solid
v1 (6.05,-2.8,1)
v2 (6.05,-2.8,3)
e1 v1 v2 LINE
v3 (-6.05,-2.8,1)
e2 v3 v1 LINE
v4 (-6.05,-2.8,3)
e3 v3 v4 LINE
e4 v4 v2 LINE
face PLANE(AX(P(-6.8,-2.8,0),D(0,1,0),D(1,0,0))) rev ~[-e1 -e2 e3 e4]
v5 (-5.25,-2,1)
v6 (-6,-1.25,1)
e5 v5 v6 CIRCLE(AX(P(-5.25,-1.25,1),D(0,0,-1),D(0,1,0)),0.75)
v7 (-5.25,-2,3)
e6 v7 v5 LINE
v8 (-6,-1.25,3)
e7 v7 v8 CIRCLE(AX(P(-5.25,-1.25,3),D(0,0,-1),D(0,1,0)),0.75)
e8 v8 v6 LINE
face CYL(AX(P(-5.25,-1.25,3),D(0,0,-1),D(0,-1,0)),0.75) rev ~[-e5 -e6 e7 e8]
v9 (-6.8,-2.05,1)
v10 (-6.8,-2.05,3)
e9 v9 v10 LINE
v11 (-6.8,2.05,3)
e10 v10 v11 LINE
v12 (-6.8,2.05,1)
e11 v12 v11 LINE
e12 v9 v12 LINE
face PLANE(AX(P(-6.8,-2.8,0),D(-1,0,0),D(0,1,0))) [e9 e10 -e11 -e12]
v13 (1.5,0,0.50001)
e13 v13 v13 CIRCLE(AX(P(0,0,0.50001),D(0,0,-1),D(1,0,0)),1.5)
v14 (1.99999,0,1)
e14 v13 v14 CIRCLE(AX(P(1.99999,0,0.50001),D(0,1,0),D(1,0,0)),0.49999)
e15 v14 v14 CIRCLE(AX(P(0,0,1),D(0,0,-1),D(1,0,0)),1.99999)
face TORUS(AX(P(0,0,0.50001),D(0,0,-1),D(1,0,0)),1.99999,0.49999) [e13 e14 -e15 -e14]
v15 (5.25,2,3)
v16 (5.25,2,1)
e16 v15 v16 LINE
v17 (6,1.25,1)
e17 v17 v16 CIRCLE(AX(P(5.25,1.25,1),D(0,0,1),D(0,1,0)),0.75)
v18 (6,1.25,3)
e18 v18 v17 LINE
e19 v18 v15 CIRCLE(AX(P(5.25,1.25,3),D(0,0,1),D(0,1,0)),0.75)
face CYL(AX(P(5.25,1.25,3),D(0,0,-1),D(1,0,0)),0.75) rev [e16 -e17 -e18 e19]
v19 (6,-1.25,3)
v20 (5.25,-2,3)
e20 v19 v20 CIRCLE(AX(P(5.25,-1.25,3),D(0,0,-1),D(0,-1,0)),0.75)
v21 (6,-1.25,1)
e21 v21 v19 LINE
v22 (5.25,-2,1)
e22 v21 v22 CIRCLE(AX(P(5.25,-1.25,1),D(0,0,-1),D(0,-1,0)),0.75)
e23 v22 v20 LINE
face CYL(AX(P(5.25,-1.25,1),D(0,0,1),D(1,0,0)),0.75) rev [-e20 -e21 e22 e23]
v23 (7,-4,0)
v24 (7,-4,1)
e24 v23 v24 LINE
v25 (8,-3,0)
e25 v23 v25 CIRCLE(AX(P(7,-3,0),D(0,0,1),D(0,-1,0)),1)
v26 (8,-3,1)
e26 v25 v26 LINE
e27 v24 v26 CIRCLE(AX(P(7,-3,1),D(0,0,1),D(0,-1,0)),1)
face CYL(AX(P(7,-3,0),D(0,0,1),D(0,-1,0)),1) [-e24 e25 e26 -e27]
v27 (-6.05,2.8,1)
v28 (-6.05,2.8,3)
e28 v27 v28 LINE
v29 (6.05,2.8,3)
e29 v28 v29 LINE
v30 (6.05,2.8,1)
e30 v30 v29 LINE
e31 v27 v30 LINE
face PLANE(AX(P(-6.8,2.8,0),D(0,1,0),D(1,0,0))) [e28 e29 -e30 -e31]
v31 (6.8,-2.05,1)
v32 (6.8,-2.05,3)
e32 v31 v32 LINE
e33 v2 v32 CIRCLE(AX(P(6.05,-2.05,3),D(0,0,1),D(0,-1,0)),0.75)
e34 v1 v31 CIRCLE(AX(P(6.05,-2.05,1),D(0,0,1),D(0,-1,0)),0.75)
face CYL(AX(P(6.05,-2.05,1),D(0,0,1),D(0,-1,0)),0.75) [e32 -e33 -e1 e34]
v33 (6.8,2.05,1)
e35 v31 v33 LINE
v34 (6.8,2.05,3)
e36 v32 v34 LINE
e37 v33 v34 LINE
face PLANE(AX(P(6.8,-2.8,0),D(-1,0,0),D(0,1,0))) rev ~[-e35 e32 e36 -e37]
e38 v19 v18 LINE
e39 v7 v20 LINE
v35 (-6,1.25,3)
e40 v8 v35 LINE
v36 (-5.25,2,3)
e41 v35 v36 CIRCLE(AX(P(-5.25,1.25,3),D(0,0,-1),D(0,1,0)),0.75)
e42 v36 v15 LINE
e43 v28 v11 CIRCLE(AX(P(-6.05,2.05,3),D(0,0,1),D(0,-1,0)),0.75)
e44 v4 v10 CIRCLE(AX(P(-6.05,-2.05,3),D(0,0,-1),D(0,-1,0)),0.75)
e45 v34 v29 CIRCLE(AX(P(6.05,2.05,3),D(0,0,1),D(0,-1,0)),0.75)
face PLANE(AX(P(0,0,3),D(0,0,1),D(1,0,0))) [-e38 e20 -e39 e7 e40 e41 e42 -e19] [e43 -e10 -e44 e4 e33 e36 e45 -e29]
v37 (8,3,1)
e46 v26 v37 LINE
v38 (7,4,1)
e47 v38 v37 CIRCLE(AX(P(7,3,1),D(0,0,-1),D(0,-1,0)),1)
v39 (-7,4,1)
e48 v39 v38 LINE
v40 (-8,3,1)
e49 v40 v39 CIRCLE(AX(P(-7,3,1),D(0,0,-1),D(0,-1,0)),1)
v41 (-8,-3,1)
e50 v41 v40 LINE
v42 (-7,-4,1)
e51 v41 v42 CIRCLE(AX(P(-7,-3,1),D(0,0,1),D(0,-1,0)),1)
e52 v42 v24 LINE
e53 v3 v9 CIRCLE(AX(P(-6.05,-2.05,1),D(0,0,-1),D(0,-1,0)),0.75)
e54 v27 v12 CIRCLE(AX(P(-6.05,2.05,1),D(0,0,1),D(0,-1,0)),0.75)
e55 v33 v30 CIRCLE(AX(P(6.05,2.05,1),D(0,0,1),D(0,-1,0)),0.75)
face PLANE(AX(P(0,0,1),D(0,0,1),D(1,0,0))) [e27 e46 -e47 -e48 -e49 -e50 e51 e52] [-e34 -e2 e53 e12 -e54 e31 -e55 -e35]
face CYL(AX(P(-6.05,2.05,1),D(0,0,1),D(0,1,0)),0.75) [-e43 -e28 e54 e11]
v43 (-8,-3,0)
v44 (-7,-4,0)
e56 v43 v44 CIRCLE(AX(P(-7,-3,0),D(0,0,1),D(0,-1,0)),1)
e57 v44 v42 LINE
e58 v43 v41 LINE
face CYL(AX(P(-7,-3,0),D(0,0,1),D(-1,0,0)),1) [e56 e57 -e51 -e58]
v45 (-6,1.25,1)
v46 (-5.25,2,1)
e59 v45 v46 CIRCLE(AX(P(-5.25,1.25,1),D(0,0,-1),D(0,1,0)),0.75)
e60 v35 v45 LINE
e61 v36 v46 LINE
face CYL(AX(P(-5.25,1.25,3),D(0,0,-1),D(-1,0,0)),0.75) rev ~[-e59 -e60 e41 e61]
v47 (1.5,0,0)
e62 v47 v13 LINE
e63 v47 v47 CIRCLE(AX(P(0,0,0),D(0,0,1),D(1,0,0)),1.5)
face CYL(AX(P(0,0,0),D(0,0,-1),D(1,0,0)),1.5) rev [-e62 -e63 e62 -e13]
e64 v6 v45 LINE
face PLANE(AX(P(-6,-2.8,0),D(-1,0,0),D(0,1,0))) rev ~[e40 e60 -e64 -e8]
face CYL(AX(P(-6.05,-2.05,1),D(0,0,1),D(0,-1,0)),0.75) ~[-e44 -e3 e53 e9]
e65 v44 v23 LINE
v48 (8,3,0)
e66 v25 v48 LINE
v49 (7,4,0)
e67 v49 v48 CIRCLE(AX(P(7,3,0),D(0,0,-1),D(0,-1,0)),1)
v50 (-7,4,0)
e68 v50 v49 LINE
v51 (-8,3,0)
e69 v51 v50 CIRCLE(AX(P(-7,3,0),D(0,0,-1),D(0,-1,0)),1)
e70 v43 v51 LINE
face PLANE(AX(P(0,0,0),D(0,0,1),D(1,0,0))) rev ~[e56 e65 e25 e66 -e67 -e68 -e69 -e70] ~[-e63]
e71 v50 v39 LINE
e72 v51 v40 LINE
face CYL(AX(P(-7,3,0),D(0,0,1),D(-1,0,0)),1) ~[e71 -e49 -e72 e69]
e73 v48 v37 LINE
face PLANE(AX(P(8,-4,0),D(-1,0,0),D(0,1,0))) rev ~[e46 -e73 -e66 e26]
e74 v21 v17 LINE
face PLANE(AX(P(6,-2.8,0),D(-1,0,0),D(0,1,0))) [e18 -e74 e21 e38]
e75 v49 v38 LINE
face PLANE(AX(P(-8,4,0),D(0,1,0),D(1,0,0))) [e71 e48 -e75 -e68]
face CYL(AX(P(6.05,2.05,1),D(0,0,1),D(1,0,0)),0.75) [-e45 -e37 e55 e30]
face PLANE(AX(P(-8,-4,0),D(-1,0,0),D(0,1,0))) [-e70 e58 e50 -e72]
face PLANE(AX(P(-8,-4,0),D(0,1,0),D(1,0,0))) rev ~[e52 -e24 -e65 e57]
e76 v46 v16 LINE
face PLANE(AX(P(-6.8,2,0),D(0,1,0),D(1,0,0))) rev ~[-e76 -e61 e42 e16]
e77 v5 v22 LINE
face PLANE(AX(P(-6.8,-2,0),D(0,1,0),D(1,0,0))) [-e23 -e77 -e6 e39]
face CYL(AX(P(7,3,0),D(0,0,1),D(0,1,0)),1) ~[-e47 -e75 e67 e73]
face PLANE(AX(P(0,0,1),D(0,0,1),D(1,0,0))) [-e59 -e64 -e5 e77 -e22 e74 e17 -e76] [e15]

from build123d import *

# Parameters (mm, degrees)
F0_W     = 13.6
F0_H     = 5.6
F1_DEPTH = 3
F2_T     = -0.8
F3_W     = 16
F3_H     = 8
F4_DEPTH = 1
F5_R     = 0.75
F6_R     = 1
F7_R     = 1.5
F8_DEPTH = 25
F10_R    = 0.49999


# Not quite as in the source:
# - a fillet or chamfer is up to 0.001 mm smaller than in the source, because OpenCascade refuses the exact size


with BuildPart() as f1:
    # F0 (on Top) → F1 (new body)
    with BuildSketch(Plane.XY):
        Rectangle(F0_W, F0_H)
    extrude(amount=F1_DEPTH)

    # F2
    f2_openings = [f1.faces().sort_by_distance(p)[0] for p in [
        (0, 0, 3),
    ]]
    offset(amount=F2_T, openings=f2_openings)

    # F3 (on Top) → F4 (join)
    with BuildSketch(Plane.XY):
        Rectangle(F3_W, F3_H)
    extrude(amount=F4_DEPTH)

    # F5
    f5_edges = [f1.edges().sort_by_distance(p)[0] for p in [
        (6.8, -2.8, 2),
        (6.8, 2.8, 2),
        (6, 2, 2),
        (6, -2, 2),
        (-6, 2, 2),
        (-6, -2, 2),
        (-6.8, 2.8, 2),
        (-6.8, -2.8, 2),
    ]]
    fillet(f5_edges, radius=F5_R)

    # F6
    f6_edges = [f1.edges().sort_by_distance(p)[0] for p in [
        (-8, -4, 0.5),
        (8, -4, 0.5),
        (8, 4, 0.5),
        (-8, 4, 0.5),
    ]]
    fillet(f6_edges, radius=F6_R)


with BuildPart() as f8:
    # F7 (on Top) → F8 (new body)
    with BuildSketch(Plane.XY):
        Circle(F7_R)
    extrude(amount=F8_DEPTH)


with BuildPart() as f1_1:
    add(f1.part)

    # F9: cut F8
    add(f8.part, mode=Mode.SUBTRACT)

    # F10 (radius 0.5 in the source; OpenCascade refuses exactly that, so slightly less here)
    f10_edges = [f1_1.edges().sort_by_distance(p)[0] for p in [
        (-1.5, 0, 1),
    ]]
    fillet(f10_edges, radius=F10_R)


solid = f1_1.part
